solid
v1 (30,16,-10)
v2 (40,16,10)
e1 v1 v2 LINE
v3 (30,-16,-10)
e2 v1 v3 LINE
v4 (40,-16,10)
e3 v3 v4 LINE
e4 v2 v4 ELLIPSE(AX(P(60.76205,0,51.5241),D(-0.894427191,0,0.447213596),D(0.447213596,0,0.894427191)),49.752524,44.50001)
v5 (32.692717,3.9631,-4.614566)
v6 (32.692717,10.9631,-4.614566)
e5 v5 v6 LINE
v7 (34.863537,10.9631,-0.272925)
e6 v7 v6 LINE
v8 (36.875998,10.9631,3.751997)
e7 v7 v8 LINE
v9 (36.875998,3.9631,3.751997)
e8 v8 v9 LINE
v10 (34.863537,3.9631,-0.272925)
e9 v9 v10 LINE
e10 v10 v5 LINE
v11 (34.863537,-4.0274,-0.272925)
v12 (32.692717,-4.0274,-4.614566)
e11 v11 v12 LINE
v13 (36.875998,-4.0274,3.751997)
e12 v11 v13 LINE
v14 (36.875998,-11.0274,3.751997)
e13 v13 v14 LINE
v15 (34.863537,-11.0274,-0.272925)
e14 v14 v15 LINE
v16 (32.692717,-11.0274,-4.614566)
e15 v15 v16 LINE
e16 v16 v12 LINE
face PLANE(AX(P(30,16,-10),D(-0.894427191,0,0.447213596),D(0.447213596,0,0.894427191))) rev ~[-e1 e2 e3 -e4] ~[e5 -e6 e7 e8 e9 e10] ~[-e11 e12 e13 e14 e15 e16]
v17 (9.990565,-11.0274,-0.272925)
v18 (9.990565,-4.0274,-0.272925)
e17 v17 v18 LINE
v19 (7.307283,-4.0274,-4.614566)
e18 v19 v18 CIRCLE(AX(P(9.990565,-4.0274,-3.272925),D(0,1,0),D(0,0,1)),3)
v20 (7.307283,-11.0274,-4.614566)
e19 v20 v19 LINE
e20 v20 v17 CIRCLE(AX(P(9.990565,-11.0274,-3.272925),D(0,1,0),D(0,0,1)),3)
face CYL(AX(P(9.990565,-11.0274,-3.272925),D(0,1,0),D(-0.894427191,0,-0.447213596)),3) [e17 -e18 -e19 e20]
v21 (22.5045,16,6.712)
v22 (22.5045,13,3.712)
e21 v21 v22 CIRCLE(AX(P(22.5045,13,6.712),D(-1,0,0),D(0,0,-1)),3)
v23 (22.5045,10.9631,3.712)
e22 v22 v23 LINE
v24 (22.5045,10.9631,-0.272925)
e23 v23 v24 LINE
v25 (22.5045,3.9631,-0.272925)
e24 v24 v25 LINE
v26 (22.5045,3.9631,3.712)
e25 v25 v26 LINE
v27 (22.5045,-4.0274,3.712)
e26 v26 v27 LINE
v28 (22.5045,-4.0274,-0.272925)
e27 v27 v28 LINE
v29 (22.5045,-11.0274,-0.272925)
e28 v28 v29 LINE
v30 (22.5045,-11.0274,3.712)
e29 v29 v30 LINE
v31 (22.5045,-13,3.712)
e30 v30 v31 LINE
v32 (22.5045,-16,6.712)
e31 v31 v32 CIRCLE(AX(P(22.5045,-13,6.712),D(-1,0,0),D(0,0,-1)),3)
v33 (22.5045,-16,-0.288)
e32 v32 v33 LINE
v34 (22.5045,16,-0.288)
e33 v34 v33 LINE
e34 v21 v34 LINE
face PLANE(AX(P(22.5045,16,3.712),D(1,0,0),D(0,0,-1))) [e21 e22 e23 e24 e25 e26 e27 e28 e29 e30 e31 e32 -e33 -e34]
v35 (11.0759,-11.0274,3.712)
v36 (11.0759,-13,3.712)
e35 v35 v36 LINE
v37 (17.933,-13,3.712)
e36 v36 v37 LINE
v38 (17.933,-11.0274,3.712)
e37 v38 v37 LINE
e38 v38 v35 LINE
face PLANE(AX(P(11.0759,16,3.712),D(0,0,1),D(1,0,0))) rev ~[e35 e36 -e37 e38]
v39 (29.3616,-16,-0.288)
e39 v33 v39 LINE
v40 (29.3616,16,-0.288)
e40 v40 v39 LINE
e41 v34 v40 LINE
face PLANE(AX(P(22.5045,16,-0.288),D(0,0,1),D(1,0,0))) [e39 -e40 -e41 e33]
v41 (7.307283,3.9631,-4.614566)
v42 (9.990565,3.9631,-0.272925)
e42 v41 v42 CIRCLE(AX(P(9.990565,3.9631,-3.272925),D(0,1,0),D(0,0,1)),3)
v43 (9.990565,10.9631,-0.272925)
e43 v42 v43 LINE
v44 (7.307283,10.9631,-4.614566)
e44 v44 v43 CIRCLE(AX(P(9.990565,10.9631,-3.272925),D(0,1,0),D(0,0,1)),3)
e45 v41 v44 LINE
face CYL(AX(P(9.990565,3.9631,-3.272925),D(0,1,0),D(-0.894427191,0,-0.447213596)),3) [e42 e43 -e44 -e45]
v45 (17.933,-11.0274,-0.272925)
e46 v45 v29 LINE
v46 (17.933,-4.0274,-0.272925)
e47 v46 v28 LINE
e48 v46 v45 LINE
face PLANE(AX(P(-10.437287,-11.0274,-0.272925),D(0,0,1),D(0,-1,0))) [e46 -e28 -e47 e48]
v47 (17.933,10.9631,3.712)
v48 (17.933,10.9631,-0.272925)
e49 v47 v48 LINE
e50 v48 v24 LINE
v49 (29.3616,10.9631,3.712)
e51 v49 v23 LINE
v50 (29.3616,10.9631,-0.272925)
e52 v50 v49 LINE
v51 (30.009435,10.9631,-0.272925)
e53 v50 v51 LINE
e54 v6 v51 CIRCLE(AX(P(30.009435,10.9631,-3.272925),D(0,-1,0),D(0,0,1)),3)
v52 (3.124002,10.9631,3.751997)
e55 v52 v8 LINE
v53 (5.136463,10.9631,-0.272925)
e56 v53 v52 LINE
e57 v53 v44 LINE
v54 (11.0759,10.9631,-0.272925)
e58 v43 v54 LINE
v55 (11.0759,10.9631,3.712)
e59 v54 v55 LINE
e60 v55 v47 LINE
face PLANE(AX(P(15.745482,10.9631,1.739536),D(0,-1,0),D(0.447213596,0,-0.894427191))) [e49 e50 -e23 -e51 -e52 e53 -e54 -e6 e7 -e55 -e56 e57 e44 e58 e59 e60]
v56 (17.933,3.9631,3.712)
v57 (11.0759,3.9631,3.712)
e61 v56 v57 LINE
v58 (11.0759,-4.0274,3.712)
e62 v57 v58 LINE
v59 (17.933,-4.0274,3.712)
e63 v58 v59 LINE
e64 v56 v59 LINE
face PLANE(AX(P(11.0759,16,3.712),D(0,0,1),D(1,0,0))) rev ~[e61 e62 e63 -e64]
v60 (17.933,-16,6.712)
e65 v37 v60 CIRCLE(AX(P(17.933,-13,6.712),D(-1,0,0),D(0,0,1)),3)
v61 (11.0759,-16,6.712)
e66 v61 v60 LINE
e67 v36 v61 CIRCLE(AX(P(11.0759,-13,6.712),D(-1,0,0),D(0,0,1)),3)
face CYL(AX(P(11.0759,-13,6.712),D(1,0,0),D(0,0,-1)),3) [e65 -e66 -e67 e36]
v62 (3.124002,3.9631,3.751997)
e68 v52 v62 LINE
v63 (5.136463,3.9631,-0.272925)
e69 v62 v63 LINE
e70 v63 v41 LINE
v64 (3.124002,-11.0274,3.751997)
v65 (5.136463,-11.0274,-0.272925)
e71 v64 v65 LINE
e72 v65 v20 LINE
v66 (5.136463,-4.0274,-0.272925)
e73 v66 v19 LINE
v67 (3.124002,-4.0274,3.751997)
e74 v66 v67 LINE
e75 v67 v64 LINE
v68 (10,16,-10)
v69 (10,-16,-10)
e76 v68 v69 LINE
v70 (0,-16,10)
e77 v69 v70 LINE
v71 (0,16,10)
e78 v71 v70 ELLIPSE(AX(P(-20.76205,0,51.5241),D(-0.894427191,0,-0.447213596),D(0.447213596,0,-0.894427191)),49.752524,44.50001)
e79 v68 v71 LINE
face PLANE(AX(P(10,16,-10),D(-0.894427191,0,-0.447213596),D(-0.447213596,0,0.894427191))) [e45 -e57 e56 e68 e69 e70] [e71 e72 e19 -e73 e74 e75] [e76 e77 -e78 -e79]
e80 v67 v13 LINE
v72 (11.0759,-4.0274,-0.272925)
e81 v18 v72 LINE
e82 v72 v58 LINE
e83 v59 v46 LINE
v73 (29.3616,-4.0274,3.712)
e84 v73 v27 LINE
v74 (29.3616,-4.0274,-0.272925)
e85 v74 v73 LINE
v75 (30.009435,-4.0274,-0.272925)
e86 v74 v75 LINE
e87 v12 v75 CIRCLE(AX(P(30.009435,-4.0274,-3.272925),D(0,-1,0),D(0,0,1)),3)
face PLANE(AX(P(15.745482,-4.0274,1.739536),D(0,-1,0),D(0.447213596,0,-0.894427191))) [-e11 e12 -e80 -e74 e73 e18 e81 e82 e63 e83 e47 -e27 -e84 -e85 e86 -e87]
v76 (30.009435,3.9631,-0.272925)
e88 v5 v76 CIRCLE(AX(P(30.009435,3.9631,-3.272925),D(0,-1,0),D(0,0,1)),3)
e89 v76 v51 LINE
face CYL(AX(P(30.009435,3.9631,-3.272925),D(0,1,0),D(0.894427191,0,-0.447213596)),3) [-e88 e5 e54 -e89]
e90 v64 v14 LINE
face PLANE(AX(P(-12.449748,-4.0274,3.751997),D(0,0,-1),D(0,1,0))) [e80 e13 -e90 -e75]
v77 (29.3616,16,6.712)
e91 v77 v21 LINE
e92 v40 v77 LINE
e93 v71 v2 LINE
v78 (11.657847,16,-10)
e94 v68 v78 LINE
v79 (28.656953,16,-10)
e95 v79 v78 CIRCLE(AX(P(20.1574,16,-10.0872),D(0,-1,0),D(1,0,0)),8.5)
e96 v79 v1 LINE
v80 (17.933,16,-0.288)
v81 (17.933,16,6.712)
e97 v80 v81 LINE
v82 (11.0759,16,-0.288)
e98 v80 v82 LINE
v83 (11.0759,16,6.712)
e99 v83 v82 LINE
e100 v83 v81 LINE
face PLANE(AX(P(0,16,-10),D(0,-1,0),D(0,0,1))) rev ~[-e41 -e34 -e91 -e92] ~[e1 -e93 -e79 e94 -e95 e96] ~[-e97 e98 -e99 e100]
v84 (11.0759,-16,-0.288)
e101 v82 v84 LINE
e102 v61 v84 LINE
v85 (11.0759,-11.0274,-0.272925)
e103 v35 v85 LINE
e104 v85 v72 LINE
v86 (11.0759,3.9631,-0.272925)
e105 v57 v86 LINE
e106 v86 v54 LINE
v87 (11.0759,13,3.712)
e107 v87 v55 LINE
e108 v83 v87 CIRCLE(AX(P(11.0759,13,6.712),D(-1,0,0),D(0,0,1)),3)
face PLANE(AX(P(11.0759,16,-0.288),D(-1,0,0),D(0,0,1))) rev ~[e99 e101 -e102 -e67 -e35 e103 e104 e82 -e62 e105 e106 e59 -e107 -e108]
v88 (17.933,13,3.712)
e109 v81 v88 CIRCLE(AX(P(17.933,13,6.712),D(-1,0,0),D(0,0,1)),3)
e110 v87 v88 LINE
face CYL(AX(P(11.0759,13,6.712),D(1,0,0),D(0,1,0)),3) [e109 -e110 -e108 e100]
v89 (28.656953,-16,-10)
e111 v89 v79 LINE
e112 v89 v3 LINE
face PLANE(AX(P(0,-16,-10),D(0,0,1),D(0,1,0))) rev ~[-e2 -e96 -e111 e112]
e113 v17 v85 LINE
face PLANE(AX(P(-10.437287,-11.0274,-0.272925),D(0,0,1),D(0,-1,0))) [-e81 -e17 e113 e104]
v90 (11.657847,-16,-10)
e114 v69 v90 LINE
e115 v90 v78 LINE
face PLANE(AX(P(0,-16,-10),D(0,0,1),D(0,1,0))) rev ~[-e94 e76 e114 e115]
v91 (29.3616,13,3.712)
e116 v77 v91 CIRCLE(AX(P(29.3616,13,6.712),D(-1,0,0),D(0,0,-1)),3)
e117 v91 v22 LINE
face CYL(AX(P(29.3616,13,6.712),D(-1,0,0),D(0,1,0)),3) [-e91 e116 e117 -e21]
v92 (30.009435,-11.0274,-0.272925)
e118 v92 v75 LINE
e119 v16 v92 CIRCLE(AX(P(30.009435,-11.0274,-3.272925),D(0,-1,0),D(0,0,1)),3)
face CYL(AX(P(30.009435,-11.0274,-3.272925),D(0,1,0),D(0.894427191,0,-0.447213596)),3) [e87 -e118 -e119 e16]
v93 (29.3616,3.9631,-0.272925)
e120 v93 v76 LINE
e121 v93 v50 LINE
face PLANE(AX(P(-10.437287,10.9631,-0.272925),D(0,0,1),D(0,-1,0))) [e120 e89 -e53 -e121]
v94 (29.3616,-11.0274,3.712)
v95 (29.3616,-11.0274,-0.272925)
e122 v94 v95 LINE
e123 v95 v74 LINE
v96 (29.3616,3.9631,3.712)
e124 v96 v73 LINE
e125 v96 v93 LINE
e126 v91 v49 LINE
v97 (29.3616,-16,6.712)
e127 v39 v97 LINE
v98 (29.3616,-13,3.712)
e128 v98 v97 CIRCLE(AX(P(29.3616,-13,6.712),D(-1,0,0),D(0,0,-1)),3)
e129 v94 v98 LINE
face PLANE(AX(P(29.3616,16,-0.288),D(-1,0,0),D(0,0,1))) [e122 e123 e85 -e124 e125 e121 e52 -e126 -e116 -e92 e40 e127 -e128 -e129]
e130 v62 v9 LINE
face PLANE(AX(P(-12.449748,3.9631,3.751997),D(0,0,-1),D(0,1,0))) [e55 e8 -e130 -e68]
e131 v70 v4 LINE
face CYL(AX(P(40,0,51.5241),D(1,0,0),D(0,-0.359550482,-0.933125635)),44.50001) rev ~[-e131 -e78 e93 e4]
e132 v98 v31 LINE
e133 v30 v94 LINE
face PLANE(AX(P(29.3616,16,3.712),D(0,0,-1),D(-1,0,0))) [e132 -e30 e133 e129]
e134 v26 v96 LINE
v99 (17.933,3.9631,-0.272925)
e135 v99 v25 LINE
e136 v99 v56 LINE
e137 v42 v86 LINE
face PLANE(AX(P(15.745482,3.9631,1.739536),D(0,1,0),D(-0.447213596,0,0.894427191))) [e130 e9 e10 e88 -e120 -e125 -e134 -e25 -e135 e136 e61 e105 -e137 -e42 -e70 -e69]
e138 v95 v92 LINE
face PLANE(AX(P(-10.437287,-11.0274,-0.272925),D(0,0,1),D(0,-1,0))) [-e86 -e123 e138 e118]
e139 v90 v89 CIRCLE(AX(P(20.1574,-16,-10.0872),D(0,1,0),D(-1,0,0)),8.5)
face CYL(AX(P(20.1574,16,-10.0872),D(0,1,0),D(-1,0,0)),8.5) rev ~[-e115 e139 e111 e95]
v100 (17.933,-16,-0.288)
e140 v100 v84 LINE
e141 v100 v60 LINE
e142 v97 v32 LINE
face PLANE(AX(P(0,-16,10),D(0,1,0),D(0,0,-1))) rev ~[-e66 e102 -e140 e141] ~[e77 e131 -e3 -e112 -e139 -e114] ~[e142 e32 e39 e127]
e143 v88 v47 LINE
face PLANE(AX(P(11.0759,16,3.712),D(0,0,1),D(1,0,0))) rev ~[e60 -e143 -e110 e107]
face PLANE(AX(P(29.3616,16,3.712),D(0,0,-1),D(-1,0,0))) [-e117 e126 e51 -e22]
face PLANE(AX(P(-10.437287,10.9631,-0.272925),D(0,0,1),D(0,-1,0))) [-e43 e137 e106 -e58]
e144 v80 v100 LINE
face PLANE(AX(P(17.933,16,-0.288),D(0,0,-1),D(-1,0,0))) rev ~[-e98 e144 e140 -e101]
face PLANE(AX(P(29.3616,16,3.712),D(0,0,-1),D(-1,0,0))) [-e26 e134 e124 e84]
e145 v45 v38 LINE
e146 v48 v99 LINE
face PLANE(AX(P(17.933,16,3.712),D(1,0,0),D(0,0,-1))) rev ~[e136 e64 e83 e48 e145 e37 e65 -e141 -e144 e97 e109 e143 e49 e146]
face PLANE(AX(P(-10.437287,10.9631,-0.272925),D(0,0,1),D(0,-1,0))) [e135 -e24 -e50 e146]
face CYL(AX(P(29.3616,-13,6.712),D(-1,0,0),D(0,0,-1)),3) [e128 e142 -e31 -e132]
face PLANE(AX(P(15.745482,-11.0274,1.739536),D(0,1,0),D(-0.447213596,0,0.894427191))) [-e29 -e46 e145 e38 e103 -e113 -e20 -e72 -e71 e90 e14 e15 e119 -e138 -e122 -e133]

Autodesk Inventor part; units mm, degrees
ref_plane "YZ Plane" through (0, 0, 0) normal (1, 0, 0) x (0, 1, 0)
ref_plane "XZ Plane" through (0, 0, 0) normal (0, 1, 0) x (-1, 0, 0)
ref_plane "XY Plane" through (0, 0, 0) normal (0, 0, 1) x (1, 0, 0)
sketch "Sketch1" plane through (0, 0, 0) normal (1, 0, 0) x (0, 1, 0)
  line L0 (16, 10) -> (-16, 10)
  line L1 (-16, 10) -> (-16, -10)
  line L2 (-16, -10) -> (16, -10)
  line L3 (16, -10) -> (16, 10)
  line L4 (16, 10) -> (-16, -10) construction
  line L5 (-16, 10) -> (16, -10) construction
  point P0 (0, 0)
  dimension "d0" = 32
  dimension "d1" = 20
extrude "Extrusion1" add sketch "Sketch1" along normal blind 40
sketch "Sketch2" plane through (40, 0, 0) normal (1, 0, 0) x (0, 0, -1)
  line L0 (-10, 16) -> (-10, -16) projected
  line L1 (-10, 16) -> (-10, -16)
  arc A0 (-10, -16) -> (-10, 16) centre (-51.5241, 0) ccw
  point P0 (0, 0)
  dimension "d4" = 44.5
extrude "Extrusion2" cut sketch "Sketch2" against normal through all
sketch "Sketch3" plane through (0, 16, -10) normal (0, 1, 0) x (1, 0, 0)
  line L0 (11.6574, 0.0872) -> (28.6574, 0.0872)
  arc A0 (11.6574, 0.0872) -> (28.6574, 0.0872) centre (20.1574, 0.0872) ccw
  line L1 (0, -20) -> (0, 0) projected
  line L2 (10, 0) -> (0, -20)
  line L3 (0, -20) -> (0, 0)
  line L4 (0, 0) -> (10, 0)
  line L5 (40, 0) -> (40, -20) projected
  line L6 (30, 0) -> (40, -20)
  line L7 (40, -20) -> (40, 0)
  line L8 (30, 0) -> (40, 0)
  line L9 (0, 0) -> (40, 0) projected
  point P0 (0, -10)
  dimension "d8" = 17
  dimension "d36" = 10
  dimension "d37" = 10
extrude "Extrusion3" cut sketch "Sketch3" against normal through all
sketch "Sketch6" plane through (20.1574, 16, -10.0872) normal (0, 1, 0) x (1, 0, 0)
  line L0 (8.4996, -0.0872) -> (9.8426, -0.0872) projected
  line L1 (-9.0815, -13.7992) -> (-2.2244, -13.7992)
  line L2 (-2.2244, -13.7992) -> (-2.2244, -9.7992)
  line L3 (-2.2244, -9.7992) -> (-9.0815, -9.7992)
  line L4 (-9.0815, -9.7992) -> (-9.0815, -13.7992)
  line L5 (9.2042, -13.7992) -> (2.3471, -13.7992)
  line L6 (2.3471, -13.7992) -> (2.3471, -9.7992)
  line L7 (2.3471, -9.7992) -> (9.2042, -9.7992)
  line L8 (9.2042, -9.7992) -> (9.2042, -13.7992)
  point P0 (-20.1574, -10.0872)
  point P1 (-8.4996, -0.0872)
  dimension "d39" = 4
extrude "Extrusion4" cut sketch "Sketch6" against normal through all
fillet "Fillet3" radius 3 4 edges at (14.5045, -16, 3.7121) (25.933, -16, 3.7121) (14.5045, 16, 3.7121) (25.933, 16, 3.7121)
sketch "Sketch7" plane through (10, -16, -10) normal (-0.8944272, 0, -0.4472136) x (-0.4472136, 0, 0.8944272)
  line L0 (15.3752, 4.9726) -> (10.8752, 4.9726)
  line L1 (10.8752, 4.9726) -> (10.8752, 11.9726)
  line L2 (10.8752, 11.9726) -> (15.3752, 11.9726)
  line L3 (15.3752, 11.9726) -> (15.3752, 4.9726)
  line L4 (15.3752, 26.9631) -> (10.8752, 26.9631)
  line L5 (10.8752, 26.9631) -> (10.8752, 19.9631)
  line L6 (10.8752, 19.9631) -> (15.3752, 19.9631)
  line L7 (15.3752, 19.9631) -> (15.3752, 26.9631)
  point P0 (13.4164, 16)
  dimension "d40" = 4.5
  dimension "d41" = 7
  dimension "d43" = 7
sketch "Sketch8" plane through (0, -16, 10) normal (0, -1, 0) x (1, 0, 0)
  line L0 (-11.5037, -8.1401) -> (42.8743, -8.1401)
  line L1 (0, 0) -> (40, 0) projected
  point P0 (0, -10)
sweep "Sweep2" cut profiles "Sketch7" path "Sketch8" path curves L0
fillet "Fillet4" radius 3 4 edges at (5.1365, -7.5274, -0.2729) (5.1365, 7.4631, -0.2729) (34.8635, -7.5274, -0.2729) (34.8635, 7.4631, -0.2729)
properties part number "VHF_platform"
